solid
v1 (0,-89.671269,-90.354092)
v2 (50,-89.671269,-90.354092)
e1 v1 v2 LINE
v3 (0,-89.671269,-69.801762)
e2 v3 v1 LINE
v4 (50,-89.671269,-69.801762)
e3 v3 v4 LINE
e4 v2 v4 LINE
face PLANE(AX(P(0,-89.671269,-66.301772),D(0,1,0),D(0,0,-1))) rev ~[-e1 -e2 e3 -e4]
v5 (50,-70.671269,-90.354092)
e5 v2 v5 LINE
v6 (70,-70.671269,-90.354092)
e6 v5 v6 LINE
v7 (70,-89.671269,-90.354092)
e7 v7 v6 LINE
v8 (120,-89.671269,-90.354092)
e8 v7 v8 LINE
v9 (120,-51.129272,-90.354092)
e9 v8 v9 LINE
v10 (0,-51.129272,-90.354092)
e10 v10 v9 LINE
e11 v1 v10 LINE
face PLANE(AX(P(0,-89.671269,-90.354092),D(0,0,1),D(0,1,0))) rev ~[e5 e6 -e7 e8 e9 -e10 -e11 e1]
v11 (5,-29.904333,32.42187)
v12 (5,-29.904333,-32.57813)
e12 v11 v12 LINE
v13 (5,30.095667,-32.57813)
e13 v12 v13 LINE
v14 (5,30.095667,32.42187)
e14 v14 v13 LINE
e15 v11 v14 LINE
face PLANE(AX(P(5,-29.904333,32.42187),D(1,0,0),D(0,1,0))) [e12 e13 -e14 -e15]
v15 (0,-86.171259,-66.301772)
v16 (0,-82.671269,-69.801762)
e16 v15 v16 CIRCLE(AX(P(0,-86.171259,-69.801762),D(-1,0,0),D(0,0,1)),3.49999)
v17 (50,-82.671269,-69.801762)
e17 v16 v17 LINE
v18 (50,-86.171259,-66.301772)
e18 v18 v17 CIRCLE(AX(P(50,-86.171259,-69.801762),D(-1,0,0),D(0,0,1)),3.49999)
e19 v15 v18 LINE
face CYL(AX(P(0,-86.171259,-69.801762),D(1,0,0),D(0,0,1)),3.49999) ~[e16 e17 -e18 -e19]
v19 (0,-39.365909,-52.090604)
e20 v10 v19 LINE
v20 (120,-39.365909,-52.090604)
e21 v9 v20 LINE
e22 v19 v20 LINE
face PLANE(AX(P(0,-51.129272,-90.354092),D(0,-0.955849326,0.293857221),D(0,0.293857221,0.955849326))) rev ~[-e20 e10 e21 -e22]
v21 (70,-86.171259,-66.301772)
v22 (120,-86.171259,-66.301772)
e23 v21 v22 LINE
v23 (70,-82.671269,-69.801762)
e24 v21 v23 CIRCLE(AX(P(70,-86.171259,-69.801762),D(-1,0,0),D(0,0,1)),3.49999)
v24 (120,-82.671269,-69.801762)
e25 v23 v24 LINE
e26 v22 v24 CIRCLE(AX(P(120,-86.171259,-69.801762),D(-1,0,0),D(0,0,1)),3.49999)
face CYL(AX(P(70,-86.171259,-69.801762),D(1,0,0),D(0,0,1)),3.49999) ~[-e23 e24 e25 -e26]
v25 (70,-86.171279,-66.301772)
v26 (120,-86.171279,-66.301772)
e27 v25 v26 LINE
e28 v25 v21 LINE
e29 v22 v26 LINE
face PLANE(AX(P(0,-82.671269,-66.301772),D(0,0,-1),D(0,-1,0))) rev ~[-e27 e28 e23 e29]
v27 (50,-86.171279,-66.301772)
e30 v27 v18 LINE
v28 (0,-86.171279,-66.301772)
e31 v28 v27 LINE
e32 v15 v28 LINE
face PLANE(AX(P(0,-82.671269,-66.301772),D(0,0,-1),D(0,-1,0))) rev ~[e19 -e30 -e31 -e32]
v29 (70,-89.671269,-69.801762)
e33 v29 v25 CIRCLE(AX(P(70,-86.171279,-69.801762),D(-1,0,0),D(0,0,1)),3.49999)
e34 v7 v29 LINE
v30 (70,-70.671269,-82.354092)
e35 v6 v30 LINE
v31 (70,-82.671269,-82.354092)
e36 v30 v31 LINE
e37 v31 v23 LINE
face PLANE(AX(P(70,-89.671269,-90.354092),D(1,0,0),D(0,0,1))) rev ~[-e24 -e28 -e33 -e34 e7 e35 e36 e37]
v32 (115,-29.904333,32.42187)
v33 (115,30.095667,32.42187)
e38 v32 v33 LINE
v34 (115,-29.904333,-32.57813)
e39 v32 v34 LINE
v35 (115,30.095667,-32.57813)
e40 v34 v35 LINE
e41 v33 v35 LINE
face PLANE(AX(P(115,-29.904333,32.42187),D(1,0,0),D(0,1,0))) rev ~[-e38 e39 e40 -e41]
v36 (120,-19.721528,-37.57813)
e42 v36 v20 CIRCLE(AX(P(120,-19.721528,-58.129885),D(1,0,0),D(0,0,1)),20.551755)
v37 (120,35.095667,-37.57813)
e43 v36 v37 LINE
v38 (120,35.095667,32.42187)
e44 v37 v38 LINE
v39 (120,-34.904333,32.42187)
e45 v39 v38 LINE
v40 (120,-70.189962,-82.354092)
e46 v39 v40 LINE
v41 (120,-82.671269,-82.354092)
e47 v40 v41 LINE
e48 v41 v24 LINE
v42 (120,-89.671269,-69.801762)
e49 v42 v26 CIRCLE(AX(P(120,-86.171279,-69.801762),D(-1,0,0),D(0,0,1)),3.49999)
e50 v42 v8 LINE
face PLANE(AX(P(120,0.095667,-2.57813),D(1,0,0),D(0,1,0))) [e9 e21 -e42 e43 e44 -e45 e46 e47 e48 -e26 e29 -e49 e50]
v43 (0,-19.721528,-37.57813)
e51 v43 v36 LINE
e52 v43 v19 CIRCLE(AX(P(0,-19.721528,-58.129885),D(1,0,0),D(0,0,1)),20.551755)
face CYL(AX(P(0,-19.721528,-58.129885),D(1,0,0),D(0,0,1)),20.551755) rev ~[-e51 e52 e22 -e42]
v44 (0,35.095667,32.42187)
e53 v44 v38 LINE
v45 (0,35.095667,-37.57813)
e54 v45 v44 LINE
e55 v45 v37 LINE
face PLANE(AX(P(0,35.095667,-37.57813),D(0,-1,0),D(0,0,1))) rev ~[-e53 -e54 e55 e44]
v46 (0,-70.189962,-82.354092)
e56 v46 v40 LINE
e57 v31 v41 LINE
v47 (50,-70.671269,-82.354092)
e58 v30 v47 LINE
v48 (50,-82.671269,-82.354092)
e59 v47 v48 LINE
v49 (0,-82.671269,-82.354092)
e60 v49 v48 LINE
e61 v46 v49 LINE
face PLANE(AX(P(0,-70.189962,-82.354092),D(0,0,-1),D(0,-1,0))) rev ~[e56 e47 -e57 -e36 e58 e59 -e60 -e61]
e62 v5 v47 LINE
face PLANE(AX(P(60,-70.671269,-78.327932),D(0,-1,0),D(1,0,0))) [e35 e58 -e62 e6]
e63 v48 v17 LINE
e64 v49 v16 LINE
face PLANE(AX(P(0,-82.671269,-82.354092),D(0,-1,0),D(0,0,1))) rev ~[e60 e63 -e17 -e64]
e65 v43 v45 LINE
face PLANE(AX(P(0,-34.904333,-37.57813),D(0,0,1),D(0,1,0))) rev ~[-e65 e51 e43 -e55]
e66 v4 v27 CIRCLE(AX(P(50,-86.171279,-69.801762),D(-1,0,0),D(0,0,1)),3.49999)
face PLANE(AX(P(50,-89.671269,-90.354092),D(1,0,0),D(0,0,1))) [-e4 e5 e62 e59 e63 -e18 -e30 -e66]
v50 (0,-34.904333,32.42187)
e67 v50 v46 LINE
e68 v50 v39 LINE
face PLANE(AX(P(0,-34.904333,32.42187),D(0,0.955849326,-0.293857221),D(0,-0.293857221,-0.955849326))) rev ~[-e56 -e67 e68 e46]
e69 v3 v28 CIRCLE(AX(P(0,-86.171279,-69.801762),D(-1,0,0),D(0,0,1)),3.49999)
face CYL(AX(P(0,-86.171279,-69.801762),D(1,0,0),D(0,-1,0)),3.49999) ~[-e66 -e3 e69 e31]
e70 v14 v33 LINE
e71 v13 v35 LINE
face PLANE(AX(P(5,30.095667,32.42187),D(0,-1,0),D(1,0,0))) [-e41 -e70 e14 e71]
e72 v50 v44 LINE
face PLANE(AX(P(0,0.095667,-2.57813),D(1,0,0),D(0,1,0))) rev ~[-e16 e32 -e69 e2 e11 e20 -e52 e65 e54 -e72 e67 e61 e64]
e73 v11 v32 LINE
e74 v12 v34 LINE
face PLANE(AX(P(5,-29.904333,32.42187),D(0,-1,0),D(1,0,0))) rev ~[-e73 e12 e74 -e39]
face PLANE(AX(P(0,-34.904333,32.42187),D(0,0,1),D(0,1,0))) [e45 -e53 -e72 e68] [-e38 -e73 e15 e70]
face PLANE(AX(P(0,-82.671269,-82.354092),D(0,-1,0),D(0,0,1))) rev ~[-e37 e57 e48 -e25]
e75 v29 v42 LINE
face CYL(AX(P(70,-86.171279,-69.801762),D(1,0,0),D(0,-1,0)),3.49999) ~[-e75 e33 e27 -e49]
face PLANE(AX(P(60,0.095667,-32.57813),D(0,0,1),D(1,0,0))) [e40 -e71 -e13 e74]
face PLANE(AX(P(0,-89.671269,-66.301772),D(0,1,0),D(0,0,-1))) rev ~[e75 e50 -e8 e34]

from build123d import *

# Parameters (mm, degrees)
F0_W     = 70
F0_H     = 70
F1_DEPTH = 120
F2_W     = 110
F2_H     = 60
F3_DEPTH = 65
F4_W     = 20
F4_H     = 24.0523201227
F5_DEPTH = 19
F6_R     = 20.5517549394
F7_R     = 3.49999


# Not quite as in the source:
# - a fillet or chamfer is up to 0.001 mm smaller than in the source, because OpenCascade refuses the exact size


with BuildPart() as f1:
    # F0 (on Right) → F1 (new body)
    with BuildSketch(Plane.YZ):
        with Locations((0.0956673622, -2.5781301591)):
            Rectangle(F0_W, F0_H)
        Polygon((-34.9043326378, -37.5781301591), (-34.9043326378, 32.4218698409), (-70.1899622679, -82.3540924191), (-82.6712690592, -82.3540924191), (-82.6712690592, -66.3017722964), (-89.6712690592, -66.3017722964), (-89.6712690592, -82.3540924191), (-89.6712690592, -90.3540924191), (-70.1899622679, -90.3540924191), (-51.1292722594, -90.3540924191), align=None)
    extrude(amount=F1_DEPTH)

    # F2 (on face) → F3 (cut)
    with BuildSketch(Plane.XY.offset(32.4218698409)):
        with Locations((60, 0.0956673622)):
            Rectangle(F2_W, F2_H)
    extrude(amount=-F3_DEPTH, mode=Mode.SUBTRACT)

    # F4 (on face) → F5 (cut)
    with BuildSketch(Plane.XZ.offset(89.6712690592)):
        with Locations((60, -78.3279323578)):
            Rectangle(F4_W, F4_H)
    extrude(amount=-F5_DEPTH, mode=Mode.SUBTRACT)

    # F6
    f6_edges = [f1.edges().sort_by_distance(p)[0] for p in [
        (60, -34.904333, -37.57813),
    ]]
    fillet(f6_edges, radius=F6_R)

    # F7 (radius 3.5 in the source; OpenCascade refuses exactly that, so slightly less here)
    f7_edges = [f1.edges().sort_by_distance(p)[0] for p in [
        (95, -82.671269, -66.301772),
        (25, -82.671269, -66.301772),
        (25, -89.671269, -66.301772),
        (95, -89.671269, -66.301772),
    ]]
    fillet(f7_edges, radius=F7_R)


solid = f1.part
